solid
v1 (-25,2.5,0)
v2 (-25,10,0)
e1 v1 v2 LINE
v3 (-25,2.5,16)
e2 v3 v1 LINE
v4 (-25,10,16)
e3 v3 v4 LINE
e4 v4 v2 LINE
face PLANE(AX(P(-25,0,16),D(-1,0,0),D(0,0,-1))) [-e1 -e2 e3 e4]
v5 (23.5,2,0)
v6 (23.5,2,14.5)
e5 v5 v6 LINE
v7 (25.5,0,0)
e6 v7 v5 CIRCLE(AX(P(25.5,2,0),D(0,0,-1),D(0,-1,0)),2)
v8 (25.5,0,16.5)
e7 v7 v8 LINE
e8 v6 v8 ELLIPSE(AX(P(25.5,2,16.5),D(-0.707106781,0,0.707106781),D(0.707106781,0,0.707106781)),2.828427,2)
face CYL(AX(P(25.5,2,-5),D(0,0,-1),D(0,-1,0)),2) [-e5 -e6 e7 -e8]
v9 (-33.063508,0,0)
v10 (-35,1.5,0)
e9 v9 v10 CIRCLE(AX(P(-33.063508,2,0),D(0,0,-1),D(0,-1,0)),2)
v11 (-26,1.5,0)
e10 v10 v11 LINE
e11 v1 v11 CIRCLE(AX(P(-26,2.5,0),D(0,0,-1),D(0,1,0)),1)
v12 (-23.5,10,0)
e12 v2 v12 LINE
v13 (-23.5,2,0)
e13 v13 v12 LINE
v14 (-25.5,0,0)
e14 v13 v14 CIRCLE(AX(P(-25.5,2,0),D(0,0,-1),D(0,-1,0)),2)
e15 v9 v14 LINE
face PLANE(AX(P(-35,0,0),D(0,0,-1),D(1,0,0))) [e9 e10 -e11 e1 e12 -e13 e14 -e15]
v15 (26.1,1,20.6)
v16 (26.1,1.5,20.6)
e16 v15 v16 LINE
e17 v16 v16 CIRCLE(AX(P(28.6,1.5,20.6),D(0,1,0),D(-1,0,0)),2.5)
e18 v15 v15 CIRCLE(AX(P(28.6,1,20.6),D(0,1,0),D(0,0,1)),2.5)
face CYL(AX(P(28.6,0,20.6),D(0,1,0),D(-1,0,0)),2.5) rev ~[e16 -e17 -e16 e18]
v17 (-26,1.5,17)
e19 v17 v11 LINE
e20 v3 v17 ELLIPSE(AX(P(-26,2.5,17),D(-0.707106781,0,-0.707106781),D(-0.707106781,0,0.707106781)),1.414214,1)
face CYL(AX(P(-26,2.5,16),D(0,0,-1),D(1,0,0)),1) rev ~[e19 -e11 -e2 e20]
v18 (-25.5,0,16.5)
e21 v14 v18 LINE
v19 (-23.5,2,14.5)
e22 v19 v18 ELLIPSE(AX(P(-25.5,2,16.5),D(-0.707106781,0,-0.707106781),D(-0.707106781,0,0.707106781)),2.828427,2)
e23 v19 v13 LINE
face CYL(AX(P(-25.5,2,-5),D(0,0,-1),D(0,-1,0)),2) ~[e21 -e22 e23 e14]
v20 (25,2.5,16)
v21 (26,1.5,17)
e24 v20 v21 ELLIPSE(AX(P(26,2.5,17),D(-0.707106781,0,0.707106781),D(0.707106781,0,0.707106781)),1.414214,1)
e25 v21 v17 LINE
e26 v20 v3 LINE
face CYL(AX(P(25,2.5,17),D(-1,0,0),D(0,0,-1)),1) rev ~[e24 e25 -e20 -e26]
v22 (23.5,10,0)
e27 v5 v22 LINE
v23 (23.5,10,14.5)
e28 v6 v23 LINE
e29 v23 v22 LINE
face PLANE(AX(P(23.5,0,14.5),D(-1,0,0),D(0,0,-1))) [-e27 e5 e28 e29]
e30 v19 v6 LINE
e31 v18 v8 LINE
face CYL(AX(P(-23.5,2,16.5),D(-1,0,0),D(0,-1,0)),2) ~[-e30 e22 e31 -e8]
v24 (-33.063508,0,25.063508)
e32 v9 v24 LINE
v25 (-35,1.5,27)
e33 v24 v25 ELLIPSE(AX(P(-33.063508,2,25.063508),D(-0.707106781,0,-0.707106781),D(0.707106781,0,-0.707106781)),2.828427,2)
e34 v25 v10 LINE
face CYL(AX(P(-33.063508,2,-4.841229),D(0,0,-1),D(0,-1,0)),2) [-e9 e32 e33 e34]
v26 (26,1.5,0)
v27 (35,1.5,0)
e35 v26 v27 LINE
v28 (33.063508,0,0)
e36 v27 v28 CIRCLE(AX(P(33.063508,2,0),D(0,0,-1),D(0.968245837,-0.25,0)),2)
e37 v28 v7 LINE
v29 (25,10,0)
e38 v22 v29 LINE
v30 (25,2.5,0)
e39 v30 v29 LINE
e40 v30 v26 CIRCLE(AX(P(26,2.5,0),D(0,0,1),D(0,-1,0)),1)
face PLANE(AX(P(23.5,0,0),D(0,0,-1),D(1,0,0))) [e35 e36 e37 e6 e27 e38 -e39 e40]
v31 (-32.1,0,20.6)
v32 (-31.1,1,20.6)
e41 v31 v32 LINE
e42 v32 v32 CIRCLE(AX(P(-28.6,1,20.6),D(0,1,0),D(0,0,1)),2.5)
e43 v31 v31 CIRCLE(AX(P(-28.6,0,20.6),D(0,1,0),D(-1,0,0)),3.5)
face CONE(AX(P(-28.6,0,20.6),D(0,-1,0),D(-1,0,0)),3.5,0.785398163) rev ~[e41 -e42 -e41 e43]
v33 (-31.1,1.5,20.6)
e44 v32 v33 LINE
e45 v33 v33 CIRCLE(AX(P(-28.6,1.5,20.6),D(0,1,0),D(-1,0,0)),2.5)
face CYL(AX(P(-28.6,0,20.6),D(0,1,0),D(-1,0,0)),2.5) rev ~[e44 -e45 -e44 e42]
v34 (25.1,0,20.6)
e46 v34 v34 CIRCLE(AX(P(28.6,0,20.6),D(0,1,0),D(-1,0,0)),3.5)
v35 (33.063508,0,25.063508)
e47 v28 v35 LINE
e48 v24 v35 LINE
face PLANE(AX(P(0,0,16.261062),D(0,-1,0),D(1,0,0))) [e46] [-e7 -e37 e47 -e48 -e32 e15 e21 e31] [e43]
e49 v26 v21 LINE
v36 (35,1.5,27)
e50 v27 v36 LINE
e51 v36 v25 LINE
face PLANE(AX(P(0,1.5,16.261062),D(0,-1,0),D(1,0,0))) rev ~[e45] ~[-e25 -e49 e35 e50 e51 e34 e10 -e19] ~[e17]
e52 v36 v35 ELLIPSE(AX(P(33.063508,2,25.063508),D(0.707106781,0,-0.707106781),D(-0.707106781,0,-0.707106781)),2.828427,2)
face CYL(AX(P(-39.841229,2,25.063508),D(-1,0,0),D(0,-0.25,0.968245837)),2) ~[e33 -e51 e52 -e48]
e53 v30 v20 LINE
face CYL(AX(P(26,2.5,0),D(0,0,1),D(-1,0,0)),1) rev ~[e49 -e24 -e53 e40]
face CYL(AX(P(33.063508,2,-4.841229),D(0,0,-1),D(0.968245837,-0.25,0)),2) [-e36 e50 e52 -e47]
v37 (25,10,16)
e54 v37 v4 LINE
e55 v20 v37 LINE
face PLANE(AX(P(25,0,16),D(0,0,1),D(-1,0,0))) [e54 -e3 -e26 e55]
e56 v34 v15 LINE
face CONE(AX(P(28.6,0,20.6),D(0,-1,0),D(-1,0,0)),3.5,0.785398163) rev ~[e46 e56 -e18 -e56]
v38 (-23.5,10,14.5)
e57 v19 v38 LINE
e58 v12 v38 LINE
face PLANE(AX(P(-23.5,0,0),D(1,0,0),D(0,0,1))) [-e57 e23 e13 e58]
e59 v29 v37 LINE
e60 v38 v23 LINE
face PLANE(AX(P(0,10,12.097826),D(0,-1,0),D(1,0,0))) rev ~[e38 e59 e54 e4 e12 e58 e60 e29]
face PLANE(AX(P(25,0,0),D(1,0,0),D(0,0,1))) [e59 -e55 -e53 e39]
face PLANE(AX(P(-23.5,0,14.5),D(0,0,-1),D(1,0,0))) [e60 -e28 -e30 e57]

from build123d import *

# Parameters (mm, degrees)
F1_DEPTH       = 1.5
F2_DEPTH       = 10
F3_D           = 5
F3_CSINK_D     = 7
F3_CSINK_ANGLE = 90
F4_T1_DEPTH    = 36.6824583655
F4_T3_DEPTH    = 79.6824583655
F4_T5_DEPTH    = 19.5
F4_T7_DEPTH    = 47
F4_T13_DEPTH   = 52
F4_T17_DEPTH   = 24.5
F4_T24_DEPTH   = 24.5
F4_T28_DEPTH   = 52
F5_R           = 1


# Not quite as in the source:
# - a fillet or chamfer that OpenCascade refuses, or shapes differently, is made with other operations: its cross-section is extruded or revolved along the edge and cut away or added


with BuildPart() as f1:
    # F0 (on Front) → F1 (new body)
    with BuildSketch(Plane.XZ):
        Polygon((35, 27), (-35, 27), (-35, 0), (-25, 0), (-25, 16), (25, 16), (25, 0), (35, 0), align=None)
        Polygon((-25, 16), (-25, 0), (-23.5, 0), (-23.5, 14.5), (23.5, 14.5), (23.5, 0), (25, 0), (25, 16), align=None)
    extrude(amount=-F1_DEPTH)

    # F0 (on Front) → F2 (join)
    with BuildSketch(Plane.XZ):
        Polygon((-25, 16), (-25, 0), (-23.5, 0), (-23.5, 14.5), (23.5, 14.5), (23.5, 0), (25, 0), (25, 16), align=None)
    extrude(amount=-F2_DEPTH)

    # F3 (through all)
    with Locations(Plane.XZ):
        with Locations((28.6, 20.6), (-28.6, 20.6)):
            CounterSinkHole(F3_D / 2, F3_CSINK_D / 2, counter_sink_angle=F3_CSINK_ANGLE)

    # F4: fillet of radius 2 on 6 edges, made by hand

    # F4_s2 → F4_t1 (cut)
    with BuildSketch(Plane.XY.offset(-4.8412291828)):
        with BuildLine():
            ThreePointArc((-33.0635083269, 0), (-34.2882531983, 0.4188611699), (-35, 1.5))
            Line((-35, 1.5), (-35.0387298335, 1.49))
            ThreePointArc((-35.0387298335, 1.49), (-35.04, 0.75), (-35.04, 0))
            Line((-35.04, 0), (-35, -0.04))
            Line((-35, -0.04), (-33.0635083269, -0.04))
            Line((-33.0635083269, -0.04), (-33.0635083269, 0))
        make_face()
        with BuildLine():
            ThreePointArc((35, 1.5), (34.2882531983, 0.4188611699), (33.0635083269, 0))
            Line((33.0635083269, 0), (33.0635083269, -0.04))
            Line((33.0635083269, -0.04), (35, -0.04))
            Line((35, -0.04), (35.04, 0))
            ThreePointArc((35.04, 0), (35.04, 0.75), (35.0387298335, 1.49))
            Line((35.0387298335, 1.49), (35, 1.5))
        make_face()
    extrude(amount=F4_T1_DEPTH, mode=Mode.SUBTRACT)

    # F4_s4 → F4_t3 (cut)
    with BuildSketch(Plane.YZ.offset(-39.8412291828)):
        with BuildLine():
            ThreePointArc((1.5, 27), (0.4188611699, 26.2882531983), (0, 25.0635083269))
            Line((0, 25.0635083269), (-0.04, 25.0635083269))
            Line((-0.04, 25.0635083269), (-0.04, 27))
            Line((-0.04, 27), (0, 27.04))
            ThreePointArc((0, 27.04), (0.75, 27.04), (1.49, 27.0387298335))
            Line((1.49, 27.0387298335), (1.5, 27))
        make_face()
    extrude(amount=F4_T3_DEPTH, mode=Mode.SUBTRACT)

    # F4_s6 → F4_t5 (cut)
    with BuildSketch(Plane.XY.offset(-5)):
        with BuildLine():
            ThreePointArc((-25.5, 0), (-24.0857864376, 0.5857864376), (-23.5, 2))
            Line((-23.5, 2), (-23.46, 2))
            Line((-23.46, 2), (-23.46, -0.04))
            Line((-23.46, -0.04), (-25.5, -0.04))
            Line((-25.5, -0.04), (-25.5, 0))
        make_face()
        with BuildLine():
            ThreePointArc((25.5, 0), (24.0857864376, 0.5857864376), (23.5, 2))
            Line((23.5, 2), (23.46, 2))
            Line((23.46, 2), (23.46, -0.04))
            Line((23.46, -0.04), (25.5, -0.04))
            Line((25.5, -0.04), (25.5, 0))
        make_face()
    extrude(amount=F4_T5_DEPTH, mode=Mode.SUBTRACT)

    # F4_s8 → F4_t7 (cut)
    with BuildSketch(Plane.YZ.offset(-23.5)):
        with BuildLine():
            ThreePointArc((0, 16.5), (0.5857864376, 15.0857864376), (2, 14.5))
            Line((2, 14.5), (2, 14.46))
            Line((2, 14.46), (-0.04, 14.46))
            Line((-0.04, 14.46), (-0.04, 16.5))
            Line((-0.04, 16.5), (0, 16.5))
        make_face()
    extrude(amount=F4_T7_DEPTH, mode=Mode.SUBTRACT)


with BuildPart() as f4_tool11:
    # F4_s12 → F4_t13 (new body)
    with BuildSketch(Plane.YZ.offset(-28.5)):
        with BuildLine():
            ThreePointArc((0, 16.5), (0.5857864376, 15.0857864376), (2, 14.5))
            Line((2, 14.5), (2, 14.46))
            Line((2, 14.46), (-0.04, 14.46))
            Line((-0.04, 14.46), (-0.04, 16.5))
            Line((-0.04, 16.5), (0, 16.5))
        make_face()
    extrude(amount=F4_T13_DEPTH)

    split(bisect_by=Plane.YZ.offset(-23.5), keep=Keep.BOTTOM)


with BuildPart() as f4_tool15:
    # F4_s16 → F4_t17 (new body)
    with BuildSketch(Plane.XY.offset(-5)):
        with BuildLine():
            ThreePointArc((-25.5, 0), (-24.0857864376, 0.5857864376), (-23.5, 2))
            Line((-23.5, 2), (-23.46, 2))
            Line((-23.46, 2), (-23.46, -0.04))
            Line((-23.46, -0.04), (-25.5, -0.04))
            Line((-25.5, -0.04), (-25.5, 0))
        make_face()
    extrude(amount=F4_T17_DEPTH)

    split(bisect_by=Plane.XY.offset(14.5), keep=Keep.TOP)


with BuildPart() as f4_tool11_1:
    add(f4_tool11.part)

    # F4_t19: intersect F4_tool15
    add(f4_tool15.part, mode=Mode.INTERSECT)


with BuildPart() as f1_1:
    add(f1.part)

    # F4_t9: cut F4_tool11
    add(f4_tool11_1.part, mode=Mode.SUBTRACT)


with BuildPart() as f4_tool22:
    # F4_s23 → F4_t24 (new body)
    with BuildSketch(Plane.XY.offset(19.5)):
        with BuildLine():
            ThreePointArc((25.5, 0), (24.0857864376, 0.5857864376), (23.5, 2))
            Line((23.5, 2), (23.46, 2))
            Line((23.46, 2), (23.46, -0.04))
            Line((23.46, -0.04), (25.5, -0.04))
            Line((25.5, -0.04), (25.5, 0))
        make_face()
    extrude(amount=-F4_T24_DEPTH)

    split(bisect_by=Plane.XY.offset(14.5), keep=Keep.TOP)


with BuildPart() as f4_tool26:
    # F4_s27 → F4_t28 (new body)
    with BuildSketch(Plane.YZ.offset(-23.5)):
        with BuildLine():
            ThreePointArc((0, 16.5), (0.5857864376, 15.0857864376), (2, 14.5))
            Line((2, 14.5), (2, 14.46))
            Line((2, 14.46), (-0.04, 14.46))
            Line((-0.04, 14.46), (-0.04, 16.5))
            Line((-0.04, 16.5), (0, 16.5))
        make_face()
    extrude(amount=F4_T28_DEPTH)

    split(bisect_by=Plane.YZ.offset(23.5), keep=Keep.TOP)


with BuildPart() as f4_tool22_1:
    add(f4_tool22.part)

    # F4_t30: intersect F4_tool26
    add(f4_tool26.part, mode=Mode.INTERSECT)


with BuildPart() as f1_2:
    add(f1_1.part)

    # F4_t20: cut F4_tool22
    add(f4_tool22_1.part, mode=Mode.SUBTRACT)

    # F5
    f5_edges = [f1_2.edges().sort_by_distance(p)[0] for p in [
        (25, 1.5, 8),
        (0, 1.5, 16),
        (-25, 1.5, 8),
    ]]
    fillet(f5_edges, radius=F5_R)


solid = f1_2.part
